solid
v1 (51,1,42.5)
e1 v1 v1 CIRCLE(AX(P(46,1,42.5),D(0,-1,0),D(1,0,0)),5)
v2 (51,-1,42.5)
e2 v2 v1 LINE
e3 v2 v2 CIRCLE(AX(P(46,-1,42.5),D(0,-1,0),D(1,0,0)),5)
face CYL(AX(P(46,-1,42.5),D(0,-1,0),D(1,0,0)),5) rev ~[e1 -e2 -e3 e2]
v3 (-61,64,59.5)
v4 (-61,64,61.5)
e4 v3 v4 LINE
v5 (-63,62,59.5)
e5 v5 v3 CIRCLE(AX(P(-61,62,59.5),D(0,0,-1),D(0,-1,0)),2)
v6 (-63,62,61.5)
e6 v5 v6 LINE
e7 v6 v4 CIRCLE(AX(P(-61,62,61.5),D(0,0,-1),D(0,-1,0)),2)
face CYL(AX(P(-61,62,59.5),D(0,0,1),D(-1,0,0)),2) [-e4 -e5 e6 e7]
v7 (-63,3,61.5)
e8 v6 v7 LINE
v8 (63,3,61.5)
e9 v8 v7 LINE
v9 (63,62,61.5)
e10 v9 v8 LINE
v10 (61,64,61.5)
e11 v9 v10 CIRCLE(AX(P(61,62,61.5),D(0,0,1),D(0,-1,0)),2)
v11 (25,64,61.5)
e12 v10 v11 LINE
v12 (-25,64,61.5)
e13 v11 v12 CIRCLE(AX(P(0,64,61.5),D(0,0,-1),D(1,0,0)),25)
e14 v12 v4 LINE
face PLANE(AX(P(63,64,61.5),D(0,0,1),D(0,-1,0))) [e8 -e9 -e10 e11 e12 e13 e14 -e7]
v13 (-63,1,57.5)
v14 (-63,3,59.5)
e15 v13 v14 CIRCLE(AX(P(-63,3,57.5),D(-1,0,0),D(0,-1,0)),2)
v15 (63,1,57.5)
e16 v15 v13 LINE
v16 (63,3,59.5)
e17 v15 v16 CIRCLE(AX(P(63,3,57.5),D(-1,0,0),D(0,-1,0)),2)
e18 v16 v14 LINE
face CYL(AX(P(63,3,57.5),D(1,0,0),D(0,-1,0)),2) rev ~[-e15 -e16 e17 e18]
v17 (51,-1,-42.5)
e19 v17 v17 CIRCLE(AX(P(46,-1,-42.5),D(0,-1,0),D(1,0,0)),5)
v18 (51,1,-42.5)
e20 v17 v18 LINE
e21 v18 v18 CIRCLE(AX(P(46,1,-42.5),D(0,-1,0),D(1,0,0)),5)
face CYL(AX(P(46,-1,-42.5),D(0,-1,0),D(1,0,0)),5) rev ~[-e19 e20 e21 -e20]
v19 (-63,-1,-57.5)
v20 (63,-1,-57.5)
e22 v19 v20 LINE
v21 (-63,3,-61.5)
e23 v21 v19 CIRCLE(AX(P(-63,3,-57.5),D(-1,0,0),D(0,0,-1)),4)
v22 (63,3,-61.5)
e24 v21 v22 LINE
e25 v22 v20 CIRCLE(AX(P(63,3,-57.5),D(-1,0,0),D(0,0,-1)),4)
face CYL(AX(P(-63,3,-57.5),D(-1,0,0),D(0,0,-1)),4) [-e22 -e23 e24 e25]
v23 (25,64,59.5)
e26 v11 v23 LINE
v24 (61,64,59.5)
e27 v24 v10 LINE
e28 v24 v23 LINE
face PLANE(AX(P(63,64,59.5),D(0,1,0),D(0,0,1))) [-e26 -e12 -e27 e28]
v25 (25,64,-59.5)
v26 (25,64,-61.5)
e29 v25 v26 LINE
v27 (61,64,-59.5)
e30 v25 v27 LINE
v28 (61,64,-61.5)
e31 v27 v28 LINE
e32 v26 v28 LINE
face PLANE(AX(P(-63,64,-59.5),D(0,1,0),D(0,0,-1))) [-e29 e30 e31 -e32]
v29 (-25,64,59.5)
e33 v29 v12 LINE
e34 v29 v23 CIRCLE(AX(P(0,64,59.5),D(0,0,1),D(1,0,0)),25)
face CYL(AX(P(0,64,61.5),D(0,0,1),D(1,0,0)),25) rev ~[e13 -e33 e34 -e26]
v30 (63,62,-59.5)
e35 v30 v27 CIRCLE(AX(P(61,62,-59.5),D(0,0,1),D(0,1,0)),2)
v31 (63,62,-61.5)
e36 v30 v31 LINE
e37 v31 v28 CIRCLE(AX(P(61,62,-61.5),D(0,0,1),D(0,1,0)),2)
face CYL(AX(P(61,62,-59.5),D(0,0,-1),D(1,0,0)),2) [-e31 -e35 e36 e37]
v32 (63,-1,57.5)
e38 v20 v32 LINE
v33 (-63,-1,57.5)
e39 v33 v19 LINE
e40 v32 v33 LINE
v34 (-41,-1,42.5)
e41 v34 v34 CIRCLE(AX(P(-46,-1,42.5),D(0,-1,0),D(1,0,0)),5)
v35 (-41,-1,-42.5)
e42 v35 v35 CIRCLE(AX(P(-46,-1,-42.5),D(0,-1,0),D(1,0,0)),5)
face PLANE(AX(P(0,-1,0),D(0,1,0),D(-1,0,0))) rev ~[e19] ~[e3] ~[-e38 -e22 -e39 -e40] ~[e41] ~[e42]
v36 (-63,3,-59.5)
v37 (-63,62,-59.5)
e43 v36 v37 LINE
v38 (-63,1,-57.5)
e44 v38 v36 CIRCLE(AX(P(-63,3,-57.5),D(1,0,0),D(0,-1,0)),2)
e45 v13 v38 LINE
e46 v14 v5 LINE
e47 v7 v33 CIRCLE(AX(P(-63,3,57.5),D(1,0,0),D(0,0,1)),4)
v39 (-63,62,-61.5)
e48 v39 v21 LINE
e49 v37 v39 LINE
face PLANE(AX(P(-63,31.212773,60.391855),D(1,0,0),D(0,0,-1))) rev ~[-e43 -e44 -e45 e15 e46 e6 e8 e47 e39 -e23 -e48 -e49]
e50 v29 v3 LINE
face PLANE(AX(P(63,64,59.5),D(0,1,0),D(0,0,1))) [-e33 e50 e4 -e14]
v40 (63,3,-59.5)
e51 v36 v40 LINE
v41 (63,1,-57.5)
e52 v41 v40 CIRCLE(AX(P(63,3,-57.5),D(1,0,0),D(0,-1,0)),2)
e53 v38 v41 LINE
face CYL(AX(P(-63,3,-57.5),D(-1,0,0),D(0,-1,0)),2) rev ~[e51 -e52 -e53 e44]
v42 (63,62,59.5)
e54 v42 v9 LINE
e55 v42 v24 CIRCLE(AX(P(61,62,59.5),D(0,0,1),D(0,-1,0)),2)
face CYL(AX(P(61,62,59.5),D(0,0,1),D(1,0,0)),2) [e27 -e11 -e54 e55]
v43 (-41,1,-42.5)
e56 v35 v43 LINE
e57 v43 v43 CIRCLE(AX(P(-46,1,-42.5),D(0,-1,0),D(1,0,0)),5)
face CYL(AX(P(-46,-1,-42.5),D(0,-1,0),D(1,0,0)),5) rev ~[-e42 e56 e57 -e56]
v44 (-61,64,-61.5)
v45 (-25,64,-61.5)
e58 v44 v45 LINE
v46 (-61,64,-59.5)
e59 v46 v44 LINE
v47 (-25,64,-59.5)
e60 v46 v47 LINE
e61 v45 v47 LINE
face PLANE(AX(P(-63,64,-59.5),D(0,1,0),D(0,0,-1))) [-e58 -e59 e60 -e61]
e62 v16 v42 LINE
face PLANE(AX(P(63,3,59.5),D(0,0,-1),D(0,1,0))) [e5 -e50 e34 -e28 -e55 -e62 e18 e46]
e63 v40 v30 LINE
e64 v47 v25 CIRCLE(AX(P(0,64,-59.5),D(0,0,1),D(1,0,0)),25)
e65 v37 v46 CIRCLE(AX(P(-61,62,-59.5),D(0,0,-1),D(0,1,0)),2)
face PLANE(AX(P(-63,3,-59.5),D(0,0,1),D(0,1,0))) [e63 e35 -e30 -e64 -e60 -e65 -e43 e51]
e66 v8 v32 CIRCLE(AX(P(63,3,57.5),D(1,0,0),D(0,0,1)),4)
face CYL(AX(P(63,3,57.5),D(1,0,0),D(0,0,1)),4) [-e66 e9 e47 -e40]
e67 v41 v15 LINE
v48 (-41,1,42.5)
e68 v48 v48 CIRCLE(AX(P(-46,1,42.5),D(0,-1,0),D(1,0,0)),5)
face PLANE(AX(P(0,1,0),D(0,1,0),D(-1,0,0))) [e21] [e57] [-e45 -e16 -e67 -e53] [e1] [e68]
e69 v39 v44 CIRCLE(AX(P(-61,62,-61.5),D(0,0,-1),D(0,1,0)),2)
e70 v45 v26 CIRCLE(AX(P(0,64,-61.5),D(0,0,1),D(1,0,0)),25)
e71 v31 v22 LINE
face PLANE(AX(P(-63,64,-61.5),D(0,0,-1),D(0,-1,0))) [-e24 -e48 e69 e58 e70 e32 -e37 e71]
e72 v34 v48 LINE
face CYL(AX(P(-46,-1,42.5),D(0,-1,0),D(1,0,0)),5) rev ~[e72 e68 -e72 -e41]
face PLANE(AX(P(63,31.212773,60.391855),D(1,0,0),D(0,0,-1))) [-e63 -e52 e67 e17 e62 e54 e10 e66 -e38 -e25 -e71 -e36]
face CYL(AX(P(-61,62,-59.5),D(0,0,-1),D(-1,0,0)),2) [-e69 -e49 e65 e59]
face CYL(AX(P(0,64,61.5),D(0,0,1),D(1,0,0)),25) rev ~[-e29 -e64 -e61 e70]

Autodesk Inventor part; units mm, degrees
ref_plane "YZ Plane" through (0, 0, 0) normal (1, 0, 0) x (0, 1, 0)
ref_plane "XZ Plane" through (0, 0, 0) normal (0, 1, 0) x (-1, 0, 0)
ref_plane "XY Plane" through (0, 0, 0) normal (0, 0, 1) x (1, 0, 0)
sketch "Sketch4" plane through (0, 0, 0) normal (0, 1, 0) x (-1, 0, 0)
  line L0 (63, -57.5) -> (-63, -57.5)
  line L1 (-63, -57.5) -> (-63, 57.5)
  line L2 (-63, 57.5) -> (63, 57.5)
  line L3 (63, 57.5) -> (63, -57.5)
  line L4 (63, -57.5) -> (-63, 57.5) construction
  point P0 (0, 0)
  point P1 (0, 0)
  dimension "d24" = 126
  dimension "d25" = 115
extrude "Plate4" add sketch "Sketch4" along normal mid plane 2
sketch "Sketch5" plane through (63, 3, 59.5) normal (0, 0, 1) x (1, 0, 0)
  line L0 (-126, 0) -> (0, 0)
  line L1 (0, 0) -> (0, 61)
  line L2 (0, 61) -> (-126, 61)
  line L3 (-126, 61) -> (-126, 0)
edge flange "Flange3" height 65 angle 90 thickness 2 bend radius 2 thickness toward (0, 0, 1) relief tear relief width 2 relief depth 1 corner gap 2 corner form 0 edges at (0, 1, 57.5) (0, 1, -57.5) wall of the first edge with corners at (-63, 3, 59.5) (63, 3, 59.5) (63, 64, 59.5) (-63, 64, 59.5)
bend "Bend3"
corner "Corner3"
sketch "Sketch6" plane through (-63, 64, 61.5) normal (0, 0, 1) x (1, 0, 0)
  line L0 (0, 0) -> (126, 0) projected
  circle A0 centre (63, 0) radius 25
  point P0 (63, -64)
  dimension "d37" = 50
extrude "Extrusion1" cut sketch "Sketch6" against normal through all
fillet "Fillet1" radius 2 4 edges at (-63, 64, -60.5) (63, 64, -60.5) (63, 64, 60.5) (-63, 64, 60.5)
sketch "Sketch7" plane through (0, -1, 0) normal (0, -1, 0) x (1, 0, 0)
  circle A0 centre (46, -42.5) radius 5
  line L0 (63, 57.5) -> (63, -57.5) projected
  line L1 (63, -57.5) -> (-63, -57.5) projected
  line L2 (25, 59.5) -> (-25, 59.5) construction
  line L3 (0, -74.3103) -> (0, 74.3103) construction
  line L4 (114.9724, 0) -> (-114.9724, 0) construction
  circle A1 centre (-46, -42.5) radius 5
  circle A2 centre (46, 42.5) radius 5
  circle A3 centre (-46, 42.5) radius 5
  point P0 (0, 0)
  point P1 (0, 0)
  dimension "d41" = 10
  dimension "d42" = 17
  dimension "d43" = 15
extrude "Extrusion2" cut sketch "Sketch7" against normal up to surface (2 mm away)
equation "\"d26\" = Thickness"
equation "\"d27\" = BendReliefWidth"
equation "\"d28\" = BendReliefDepth"
equation "\"d29\" = MinimumRemnant"
equation "\"d30\" = TransitionRadius"
equation "\"d33\" = BendRadius"
equation "\"d34\" = CornerReliefSize"
equation "\"d35\" = GapSize"
equation "\"d36\" = JacobiRadiusSize"
equation "\"BendRadius\" = Thickness"
equation "\"BendReliefWidth\" = Thickness"
equation "\"BendReliefDepth\" = 0.5 * Thickness"
equation "\"CornerReliefSize\" = 4 * Thickness"
equation "\"MinimumRemnant\" = 2 * Thickness"
equation "\"TransitionRadius\" = BendRadius"
equation "\"JacobiRadiusSize\" = BendRadius"
equation "\"GapSize\" = Thickness"
equation "\"Thickness\" = 2"
properties part number "Крепление"
